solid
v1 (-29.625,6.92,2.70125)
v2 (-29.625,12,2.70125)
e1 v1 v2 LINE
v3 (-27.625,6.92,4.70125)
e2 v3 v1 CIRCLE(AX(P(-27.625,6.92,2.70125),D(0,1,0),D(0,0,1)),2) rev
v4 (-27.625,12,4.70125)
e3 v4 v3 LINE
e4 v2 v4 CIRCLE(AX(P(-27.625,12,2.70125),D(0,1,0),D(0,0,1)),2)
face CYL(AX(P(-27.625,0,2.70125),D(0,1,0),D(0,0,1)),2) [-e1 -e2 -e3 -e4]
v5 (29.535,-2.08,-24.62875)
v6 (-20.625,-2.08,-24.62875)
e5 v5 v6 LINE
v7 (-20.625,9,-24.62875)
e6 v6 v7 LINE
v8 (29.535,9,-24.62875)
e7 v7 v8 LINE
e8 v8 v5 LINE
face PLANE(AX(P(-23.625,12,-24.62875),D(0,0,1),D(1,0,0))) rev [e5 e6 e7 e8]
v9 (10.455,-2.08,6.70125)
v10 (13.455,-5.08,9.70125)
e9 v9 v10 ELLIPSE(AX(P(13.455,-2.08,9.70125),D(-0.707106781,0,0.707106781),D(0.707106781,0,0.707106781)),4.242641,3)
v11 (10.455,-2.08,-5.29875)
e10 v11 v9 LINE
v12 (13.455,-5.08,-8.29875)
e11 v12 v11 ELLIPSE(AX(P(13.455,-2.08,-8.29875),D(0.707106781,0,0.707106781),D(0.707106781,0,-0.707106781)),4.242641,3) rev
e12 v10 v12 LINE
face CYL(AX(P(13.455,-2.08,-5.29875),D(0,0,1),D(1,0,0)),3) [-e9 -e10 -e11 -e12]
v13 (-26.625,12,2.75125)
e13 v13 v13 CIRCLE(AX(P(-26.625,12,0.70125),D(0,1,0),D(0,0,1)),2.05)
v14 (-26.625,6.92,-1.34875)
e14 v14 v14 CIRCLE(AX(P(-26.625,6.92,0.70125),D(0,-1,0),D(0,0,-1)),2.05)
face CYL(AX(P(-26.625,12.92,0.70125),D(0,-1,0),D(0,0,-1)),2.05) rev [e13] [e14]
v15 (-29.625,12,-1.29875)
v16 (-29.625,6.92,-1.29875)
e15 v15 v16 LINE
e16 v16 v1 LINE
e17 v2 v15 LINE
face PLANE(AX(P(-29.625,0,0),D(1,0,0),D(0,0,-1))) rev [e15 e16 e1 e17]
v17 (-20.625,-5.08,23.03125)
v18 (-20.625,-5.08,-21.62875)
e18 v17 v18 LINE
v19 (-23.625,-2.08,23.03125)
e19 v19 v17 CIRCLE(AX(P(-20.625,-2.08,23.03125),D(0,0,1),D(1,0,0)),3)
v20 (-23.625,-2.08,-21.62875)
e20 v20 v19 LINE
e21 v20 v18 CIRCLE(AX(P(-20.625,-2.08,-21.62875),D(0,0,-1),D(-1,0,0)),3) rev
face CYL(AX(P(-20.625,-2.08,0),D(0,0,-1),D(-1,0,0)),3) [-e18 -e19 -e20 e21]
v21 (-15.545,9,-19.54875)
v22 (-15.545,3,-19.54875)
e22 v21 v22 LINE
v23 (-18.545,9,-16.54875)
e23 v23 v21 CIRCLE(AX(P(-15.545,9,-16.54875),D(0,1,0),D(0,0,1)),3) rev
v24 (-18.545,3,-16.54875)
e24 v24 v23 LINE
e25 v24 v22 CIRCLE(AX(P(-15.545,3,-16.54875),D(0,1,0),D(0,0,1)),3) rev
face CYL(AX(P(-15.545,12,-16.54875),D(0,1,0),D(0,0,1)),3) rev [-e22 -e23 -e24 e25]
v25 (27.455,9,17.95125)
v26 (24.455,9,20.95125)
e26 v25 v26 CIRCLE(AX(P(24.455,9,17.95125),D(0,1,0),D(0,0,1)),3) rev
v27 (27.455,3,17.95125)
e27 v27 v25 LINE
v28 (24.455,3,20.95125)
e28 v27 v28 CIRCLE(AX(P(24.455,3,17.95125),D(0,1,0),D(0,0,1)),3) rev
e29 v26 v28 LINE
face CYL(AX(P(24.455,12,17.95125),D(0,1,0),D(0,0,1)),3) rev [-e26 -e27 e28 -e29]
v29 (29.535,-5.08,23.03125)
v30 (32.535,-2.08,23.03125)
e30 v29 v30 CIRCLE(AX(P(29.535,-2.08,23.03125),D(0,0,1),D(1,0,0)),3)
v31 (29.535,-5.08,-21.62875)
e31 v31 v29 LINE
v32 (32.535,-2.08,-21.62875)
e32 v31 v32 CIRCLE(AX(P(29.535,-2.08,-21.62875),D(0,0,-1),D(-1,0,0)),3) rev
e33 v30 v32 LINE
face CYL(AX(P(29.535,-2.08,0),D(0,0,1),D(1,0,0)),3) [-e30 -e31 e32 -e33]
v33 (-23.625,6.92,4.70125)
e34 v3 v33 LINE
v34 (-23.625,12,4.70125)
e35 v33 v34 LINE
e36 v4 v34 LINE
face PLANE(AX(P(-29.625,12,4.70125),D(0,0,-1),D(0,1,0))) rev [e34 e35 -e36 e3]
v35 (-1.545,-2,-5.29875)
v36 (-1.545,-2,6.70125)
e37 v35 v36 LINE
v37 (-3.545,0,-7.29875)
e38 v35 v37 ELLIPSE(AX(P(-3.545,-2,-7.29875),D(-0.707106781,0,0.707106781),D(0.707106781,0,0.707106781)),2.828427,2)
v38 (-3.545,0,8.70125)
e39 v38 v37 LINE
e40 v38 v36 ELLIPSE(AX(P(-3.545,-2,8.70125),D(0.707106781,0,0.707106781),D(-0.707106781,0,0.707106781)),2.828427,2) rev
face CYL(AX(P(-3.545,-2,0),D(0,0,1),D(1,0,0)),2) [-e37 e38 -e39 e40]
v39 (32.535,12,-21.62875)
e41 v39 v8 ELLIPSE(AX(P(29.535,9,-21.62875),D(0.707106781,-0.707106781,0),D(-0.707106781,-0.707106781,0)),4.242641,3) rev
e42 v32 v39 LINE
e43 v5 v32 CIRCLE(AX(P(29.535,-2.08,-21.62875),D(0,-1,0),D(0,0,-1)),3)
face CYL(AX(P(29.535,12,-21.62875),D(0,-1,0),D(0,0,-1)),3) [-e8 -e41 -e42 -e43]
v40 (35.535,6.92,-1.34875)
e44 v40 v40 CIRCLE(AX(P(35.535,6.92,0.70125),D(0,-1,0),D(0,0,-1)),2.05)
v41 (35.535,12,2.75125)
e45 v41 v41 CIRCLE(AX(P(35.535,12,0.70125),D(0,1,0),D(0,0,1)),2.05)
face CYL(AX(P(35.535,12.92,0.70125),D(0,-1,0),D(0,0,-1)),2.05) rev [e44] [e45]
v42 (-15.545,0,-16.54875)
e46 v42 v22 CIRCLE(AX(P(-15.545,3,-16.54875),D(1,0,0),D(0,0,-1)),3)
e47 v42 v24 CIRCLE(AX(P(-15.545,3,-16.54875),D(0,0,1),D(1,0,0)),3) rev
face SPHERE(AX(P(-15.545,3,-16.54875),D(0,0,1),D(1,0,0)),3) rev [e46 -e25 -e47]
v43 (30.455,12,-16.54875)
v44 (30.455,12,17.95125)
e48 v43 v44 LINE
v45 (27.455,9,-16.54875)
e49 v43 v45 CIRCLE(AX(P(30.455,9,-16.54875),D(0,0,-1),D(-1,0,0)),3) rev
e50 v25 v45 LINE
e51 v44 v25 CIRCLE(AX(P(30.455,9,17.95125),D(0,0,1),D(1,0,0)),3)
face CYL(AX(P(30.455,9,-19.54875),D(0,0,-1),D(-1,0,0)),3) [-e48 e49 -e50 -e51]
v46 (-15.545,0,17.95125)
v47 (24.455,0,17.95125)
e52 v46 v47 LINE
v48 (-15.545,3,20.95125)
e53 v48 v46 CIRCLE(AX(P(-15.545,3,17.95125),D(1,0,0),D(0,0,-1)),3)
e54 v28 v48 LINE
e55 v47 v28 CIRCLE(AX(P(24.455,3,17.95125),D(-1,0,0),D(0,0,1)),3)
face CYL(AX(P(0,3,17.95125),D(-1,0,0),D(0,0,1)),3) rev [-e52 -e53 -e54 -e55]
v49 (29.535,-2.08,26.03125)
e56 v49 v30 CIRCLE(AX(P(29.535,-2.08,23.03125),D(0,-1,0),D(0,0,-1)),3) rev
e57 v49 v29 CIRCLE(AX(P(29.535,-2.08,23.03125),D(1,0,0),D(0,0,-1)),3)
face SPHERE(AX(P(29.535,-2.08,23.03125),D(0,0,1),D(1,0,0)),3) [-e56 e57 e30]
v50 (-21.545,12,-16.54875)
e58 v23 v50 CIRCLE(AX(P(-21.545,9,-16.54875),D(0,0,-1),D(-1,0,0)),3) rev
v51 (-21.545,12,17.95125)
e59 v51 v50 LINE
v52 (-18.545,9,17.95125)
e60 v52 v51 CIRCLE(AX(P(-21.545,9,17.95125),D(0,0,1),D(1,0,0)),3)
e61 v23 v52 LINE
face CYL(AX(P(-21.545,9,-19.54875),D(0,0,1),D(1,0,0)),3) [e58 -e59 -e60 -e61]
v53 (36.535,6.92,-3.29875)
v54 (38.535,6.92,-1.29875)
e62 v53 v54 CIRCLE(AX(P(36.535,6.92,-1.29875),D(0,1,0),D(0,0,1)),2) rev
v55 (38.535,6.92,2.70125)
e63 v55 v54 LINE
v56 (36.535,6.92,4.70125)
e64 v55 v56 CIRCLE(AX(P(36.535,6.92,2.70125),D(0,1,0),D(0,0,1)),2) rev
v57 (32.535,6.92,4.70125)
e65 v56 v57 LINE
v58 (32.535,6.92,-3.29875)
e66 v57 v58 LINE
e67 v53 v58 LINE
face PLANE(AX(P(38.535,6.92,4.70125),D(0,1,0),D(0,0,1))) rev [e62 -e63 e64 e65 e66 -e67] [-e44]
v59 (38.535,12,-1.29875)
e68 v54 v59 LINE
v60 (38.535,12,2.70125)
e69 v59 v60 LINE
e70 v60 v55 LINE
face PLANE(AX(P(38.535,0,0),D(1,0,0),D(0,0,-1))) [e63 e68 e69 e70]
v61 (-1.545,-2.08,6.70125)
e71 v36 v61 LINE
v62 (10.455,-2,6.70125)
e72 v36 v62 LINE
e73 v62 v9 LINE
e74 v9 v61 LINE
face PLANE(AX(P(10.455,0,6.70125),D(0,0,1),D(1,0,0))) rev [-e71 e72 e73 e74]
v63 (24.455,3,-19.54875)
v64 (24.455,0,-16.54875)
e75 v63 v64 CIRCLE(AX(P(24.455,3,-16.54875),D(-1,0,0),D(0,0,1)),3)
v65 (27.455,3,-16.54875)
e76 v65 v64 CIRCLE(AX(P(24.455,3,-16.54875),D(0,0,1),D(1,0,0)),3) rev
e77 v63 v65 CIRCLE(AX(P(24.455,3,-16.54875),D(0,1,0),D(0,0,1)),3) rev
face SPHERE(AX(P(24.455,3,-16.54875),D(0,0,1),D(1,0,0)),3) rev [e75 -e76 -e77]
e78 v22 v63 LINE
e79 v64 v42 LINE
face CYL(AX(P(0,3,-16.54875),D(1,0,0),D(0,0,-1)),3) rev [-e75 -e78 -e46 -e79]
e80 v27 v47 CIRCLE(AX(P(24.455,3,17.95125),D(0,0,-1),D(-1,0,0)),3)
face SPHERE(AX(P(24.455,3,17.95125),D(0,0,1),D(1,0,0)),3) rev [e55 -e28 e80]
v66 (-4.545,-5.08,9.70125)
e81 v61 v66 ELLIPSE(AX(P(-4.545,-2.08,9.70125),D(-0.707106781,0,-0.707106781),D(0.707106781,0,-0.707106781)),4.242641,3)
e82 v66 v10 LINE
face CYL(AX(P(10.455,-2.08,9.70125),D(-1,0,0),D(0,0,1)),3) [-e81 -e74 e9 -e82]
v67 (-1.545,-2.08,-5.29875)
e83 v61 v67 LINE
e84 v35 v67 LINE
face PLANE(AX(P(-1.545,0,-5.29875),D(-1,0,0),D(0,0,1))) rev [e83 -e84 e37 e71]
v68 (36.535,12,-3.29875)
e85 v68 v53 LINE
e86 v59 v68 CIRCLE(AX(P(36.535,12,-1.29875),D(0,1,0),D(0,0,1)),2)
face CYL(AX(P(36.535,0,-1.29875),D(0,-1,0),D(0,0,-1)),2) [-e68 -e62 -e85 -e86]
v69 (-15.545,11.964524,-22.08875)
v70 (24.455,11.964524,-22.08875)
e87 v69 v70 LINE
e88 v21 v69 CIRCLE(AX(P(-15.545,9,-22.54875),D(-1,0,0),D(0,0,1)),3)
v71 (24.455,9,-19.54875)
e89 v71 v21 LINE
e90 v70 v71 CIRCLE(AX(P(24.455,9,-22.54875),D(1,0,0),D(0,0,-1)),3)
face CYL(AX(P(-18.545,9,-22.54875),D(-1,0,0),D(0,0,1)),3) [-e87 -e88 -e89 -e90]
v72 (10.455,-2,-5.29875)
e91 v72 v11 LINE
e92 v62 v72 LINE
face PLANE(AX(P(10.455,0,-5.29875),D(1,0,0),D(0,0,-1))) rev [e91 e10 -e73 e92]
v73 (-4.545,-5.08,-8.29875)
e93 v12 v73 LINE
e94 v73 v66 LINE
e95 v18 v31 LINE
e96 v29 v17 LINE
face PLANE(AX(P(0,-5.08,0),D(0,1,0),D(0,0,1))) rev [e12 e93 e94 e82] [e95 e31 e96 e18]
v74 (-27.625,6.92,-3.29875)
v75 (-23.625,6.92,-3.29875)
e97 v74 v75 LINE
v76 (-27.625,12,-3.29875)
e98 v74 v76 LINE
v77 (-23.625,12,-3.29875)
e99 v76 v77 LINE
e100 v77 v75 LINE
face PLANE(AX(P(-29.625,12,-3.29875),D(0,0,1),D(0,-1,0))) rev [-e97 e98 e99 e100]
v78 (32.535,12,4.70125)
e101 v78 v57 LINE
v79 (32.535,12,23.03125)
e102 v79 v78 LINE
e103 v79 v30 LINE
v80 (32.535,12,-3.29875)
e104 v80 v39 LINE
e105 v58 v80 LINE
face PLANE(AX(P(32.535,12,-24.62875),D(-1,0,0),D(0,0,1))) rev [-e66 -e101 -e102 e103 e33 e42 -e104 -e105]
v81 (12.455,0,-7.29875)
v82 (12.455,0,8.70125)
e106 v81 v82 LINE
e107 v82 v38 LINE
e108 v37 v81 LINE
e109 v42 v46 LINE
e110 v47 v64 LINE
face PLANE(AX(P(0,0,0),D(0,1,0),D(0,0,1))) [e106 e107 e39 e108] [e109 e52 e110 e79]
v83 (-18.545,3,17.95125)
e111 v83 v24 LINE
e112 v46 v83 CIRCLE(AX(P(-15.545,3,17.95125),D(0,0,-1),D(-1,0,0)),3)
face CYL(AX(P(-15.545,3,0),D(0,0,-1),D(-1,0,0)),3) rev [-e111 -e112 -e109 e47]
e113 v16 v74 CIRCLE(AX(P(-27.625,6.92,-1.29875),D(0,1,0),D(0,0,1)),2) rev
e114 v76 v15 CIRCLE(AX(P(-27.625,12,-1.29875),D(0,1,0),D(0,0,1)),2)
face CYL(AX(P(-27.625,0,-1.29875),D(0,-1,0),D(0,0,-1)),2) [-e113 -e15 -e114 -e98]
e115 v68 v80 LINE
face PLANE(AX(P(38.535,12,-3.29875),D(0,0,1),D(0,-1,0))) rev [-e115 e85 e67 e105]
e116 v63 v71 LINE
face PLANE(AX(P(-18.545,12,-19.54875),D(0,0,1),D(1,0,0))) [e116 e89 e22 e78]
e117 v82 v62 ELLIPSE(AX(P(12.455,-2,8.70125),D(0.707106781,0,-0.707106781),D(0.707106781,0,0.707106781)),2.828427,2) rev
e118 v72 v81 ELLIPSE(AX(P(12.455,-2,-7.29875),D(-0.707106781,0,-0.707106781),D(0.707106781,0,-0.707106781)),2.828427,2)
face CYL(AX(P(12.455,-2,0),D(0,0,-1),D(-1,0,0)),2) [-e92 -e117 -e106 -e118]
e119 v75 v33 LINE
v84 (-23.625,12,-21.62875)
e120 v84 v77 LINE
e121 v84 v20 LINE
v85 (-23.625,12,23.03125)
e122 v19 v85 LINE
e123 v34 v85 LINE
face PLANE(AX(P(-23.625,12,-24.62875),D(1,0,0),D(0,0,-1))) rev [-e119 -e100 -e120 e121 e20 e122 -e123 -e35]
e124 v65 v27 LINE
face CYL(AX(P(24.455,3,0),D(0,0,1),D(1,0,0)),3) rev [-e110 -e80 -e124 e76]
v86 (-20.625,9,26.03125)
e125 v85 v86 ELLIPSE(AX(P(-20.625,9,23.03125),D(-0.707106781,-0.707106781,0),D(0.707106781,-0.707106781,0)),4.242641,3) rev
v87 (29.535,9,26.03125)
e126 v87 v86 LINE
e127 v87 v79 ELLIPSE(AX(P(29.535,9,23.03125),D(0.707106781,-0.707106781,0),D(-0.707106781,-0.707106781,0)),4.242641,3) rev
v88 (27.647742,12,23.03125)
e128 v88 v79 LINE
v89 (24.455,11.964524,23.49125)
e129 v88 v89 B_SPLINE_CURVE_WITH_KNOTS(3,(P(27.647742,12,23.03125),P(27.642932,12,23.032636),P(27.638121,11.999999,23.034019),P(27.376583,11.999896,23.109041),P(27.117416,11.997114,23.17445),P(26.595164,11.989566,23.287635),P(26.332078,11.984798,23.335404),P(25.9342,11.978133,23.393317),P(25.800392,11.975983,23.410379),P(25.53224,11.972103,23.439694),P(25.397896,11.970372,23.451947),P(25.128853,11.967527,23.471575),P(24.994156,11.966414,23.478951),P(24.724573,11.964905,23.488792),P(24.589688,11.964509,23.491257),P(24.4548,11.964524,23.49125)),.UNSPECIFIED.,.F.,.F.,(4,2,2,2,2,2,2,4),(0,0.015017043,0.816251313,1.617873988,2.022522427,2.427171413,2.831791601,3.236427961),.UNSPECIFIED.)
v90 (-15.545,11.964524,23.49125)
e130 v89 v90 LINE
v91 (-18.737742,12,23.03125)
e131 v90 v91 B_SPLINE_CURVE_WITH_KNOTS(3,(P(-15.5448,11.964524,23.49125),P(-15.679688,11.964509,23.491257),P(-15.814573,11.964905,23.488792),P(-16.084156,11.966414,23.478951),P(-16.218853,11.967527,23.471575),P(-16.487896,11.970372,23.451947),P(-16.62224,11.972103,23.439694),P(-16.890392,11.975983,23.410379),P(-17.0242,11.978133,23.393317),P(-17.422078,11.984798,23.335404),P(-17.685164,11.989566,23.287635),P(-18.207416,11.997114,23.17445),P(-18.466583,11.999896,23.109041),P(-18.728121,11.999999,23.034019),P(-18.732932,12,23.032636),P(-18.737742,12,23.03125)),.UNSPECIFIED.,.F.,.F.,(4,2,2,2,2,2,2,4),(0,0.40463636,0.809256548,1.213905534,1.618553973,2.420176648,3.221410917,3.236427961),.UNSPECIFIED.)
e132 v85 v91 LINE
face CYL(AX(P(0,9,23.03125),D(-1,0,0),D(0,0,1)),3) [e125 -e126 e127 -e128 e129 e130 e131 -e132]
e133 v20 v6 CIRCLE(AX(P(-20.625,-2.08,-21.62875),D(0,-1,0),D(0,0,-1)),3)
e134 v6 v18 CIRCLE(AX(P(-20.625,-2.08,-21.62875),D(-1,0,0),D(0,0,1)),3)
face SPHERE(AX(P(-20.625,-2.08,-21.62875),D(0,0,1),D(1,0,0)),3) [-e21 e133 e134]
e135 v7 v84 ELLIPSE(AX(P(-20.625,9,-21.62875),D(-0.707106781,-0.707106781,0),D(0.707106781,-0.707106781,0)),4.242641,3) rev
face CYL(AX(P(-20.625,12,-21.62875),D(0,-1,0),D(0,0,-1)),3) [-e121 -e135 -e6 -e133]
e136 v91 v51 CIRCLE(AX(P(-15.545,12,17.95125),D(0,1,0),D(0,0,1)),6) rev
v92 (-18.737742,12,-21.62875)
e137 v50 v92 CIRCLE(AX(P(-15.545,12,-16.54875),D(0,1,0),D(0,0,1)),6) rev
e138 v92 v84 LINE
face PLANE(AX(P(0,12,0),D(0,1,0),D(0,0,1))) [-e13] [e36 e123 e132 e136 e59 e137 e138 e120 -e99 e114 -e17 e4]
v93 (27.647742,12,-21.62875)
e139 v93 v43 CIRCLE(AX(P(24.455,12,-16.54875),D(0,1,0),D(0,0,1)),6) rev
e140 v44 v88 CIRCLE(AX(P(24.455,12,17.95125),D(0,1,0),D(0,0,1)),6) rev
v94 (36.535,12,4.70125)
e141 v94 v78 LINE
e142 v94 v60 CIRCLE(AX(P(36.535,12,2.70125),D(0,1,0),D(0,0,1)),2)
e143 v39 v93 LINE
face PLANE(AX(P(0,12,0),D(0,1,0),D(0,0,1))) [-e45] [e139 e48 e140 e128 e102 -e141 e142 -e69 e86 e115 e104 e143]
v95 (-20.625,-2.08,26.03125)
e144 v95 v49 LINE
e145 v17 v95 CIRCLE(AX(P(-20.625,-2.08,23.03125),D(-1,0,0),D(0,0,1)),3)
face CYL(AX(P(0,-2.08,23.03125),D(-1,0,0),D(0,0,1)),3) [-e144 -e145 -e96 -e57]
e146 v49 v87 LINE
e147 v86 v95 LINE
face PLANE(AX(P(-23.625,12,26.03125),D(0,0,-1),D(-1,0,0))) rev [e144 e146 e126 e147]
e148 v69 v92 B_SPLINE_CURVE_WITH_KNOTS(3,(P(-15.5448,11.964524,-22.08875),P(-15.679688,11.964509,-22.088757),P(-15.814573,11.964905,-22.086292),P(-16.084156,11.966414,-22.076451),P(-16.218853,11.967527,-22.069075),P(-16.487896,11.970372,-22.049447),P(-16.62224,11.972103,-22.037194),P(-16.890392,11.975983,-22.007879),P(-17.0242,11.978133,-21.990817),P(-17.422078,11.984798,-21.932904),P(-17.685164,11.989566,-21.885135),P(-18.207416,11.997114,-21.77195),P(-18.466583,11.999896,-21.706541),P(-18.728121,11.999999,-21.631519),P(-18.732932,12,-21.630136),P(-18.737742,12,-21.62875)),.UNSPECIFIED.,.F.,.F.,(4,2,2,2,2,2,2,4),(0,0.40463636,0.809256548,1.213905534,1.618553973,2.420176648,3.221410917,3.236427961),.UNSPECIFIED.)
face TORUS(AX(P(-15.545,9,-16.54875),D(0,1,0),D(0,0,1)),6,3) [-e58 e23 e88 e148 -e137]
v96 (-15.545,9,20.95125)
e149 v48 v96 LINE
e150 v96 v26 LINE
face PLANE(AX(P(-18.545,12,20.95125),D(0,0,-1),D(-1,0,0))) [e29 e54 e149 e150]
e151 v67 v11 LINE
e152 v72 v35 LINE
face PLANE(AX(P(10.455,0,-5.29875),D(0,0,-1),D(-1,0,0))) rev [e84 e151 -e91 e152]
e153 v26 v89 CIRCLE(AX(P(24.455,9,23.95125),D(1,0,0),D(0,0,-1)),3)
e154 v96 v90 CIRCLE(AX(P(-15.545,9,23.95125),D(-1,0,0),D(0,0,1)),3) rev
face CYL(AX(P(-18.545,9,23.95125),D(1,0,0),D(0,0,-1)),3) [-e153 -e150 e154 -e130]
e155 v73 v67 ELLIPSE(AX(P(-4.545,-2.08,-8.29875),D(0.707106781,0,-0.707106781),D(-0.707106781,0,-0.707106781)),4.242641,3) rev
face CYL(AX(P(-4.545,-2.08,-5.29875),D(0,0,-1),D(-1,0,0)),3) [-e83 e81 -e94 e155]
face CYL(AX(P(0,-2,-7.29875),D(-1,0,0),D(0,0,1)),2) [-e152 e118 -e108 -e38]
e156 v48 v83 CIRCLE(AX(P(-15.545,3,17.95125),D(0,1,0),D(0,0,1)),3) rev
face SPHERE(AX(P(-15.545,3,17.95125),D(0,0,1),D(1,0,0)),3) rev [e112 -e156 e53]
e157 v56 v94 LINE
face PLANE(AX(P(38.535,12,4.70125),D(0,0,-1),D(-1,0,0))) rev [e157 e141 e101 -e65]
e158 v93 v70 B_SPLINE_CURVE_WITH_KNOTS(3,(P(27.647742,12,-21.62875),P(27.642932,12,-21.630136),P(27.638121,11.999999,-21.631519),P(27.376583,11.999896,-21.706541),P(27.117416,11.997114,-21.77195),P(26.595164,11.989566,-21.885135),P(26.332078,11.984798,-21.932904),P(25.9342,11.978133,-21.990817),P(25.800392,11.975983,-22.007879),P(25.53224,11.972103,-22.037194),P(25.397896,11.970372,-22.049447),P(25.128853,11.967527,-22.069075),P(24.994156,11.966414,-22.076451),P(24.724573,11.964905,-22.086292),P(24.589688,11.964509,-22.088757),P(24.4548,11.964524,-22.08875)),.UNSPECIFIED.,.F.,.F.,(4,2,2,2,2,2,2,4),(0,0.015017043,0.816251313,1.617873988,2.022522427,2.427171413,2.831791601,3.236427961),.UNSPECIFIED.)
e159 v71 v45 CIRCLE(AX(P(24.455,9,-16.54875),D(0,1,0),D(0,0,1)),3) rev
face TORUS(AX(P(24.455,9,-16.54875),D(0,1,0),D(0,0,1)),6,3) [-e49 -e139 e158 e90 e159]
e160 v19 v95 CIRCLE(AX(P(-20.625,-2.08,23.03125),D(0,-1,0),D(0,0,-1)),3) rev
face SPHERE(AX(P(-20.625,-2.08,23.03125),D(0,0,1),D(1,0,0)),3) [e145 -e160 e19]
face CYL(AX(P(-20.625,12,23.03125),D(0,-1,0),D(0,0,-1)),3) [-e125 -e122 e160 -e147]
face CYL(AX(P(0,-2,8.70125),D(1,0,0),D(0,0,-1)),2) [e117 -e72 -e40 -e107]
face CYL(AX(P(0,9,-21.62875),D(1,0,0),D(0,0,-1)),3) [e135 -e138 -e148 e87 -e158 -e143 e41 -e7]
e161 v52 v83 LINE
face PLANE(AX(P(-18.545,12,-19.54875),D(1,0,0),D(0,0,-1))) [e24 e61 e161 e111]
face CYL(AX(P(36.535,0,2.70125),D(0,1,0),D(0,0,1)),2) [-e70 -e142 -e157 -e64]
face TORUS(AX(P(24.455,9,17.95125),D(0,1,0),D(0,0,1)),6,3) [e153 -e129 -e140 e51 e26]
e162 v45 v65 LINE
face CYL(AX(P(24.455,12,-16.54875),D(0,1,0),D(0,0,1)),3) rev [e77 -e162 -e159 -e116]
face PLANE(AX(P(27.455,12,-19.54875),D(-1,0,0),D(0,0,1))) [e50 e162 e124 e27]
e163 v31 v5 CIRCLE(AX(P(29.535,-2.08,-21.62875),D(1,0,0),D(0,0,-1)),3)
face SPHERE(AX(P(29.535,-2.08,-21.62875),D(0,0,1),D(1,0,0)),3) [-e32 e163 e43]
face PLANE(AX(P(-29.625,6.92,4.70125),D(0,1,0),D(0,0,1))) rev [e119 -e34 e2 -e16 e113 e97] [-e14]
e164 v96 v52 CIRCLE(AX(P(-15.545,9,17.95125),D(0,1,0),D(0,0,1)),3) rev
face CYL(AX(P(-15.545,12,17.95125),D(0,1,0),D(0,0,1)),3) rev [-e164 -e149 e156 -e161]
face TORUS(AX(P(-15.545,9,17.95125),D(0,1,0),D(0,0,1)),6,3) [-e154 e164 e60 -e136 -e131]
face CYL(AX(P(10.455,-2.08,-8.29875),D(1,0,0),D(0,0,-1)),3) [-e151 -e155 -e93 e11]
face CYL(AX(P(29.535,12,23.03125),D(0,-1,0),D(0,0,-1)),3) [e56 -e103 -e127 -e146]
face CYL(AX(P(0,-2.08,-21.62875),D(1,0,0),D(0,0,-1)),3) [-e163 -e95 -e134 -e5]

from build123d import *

# Parameters (mm, degrees)
SKETCH1_W           = 56.16
SKETCH1_H           = 50.66
SKETCH1_W_2         = 46
SKETCH1_H_2         = 40.5
BOSS_EXTRUDE1_DEPTH = 12
SKETCH2_W           = 56.16
SKETCH2_H           = 50.66
BOSS_EXTRUDE2_DEPTH = 5.08
SKETCH3_W           = 12
SKETCH3_H           = 12
CUT_EXTRUDE1_DEPTH  = 5.08
SKETCH4_W           = 8
SKETCH4_H           = 5.08
BOSS_EXTRUDE3_DEPTH = 6
SKETCH5_W           = 8
SKETCH5_H           = 5.08
BOSS_EXTRUDE4_DEPTH = 6
SKETCH6_R           = 2.05
CUT_EXTRUDE2_DEPTH  = 6
FILLET1_R           = 3
FILLET2_R           = 2
FILLET3_R           = 2


with BuildPart() as part:
    # Sketch1 → Boss-Extrude1 (new body)
    with BuildSketch(Plane(origin=(0, 0, 0), x_dir=(1, 0, 0), z_dir=(0, 1, 0))):
        with Locations((4.455, -0.70125)):
            Rectangle(SKETCH1_W, SKETCH1_H)
        with Locations((4.455, -0.70125)):
            Rectangle(SKETCH1_W_2, SKETCH1_H_2, mode=Mode.SUBTRACT)
    extrude(amount=BOSS_EXTRUDE1_DEPTH)

    # Sketch2 → Boss-Extrude2 (add)
    with BuildSketch(Plane.XZ):
        with Locations((4.455, 0.70125)):
            Rectangle(SKETCH2_W, SKETCH2_H)
    extrude(amount=BOSS_EXTRUDE2_DEPTH)

    # Sketch3 → Cut-Extrude1 (cut)
    with BuildSketch(Plane.XZ.offset(5.08)):
        with Locations((4.455, 0.70125)):
            Rectangle(SKETCH3_W, SKETCH3_H)
    extrude(amount=-CUT_EXTRUDE1_DEPTH, mode=Mode.SUBTRACT)

    # Sketch4 → Boss-Extrude3 (add)
    with BuildSketch(Plane(origin=(32.535, 0, 0), x_dir=(0, 0, -1), z_dir=(1, 0, 0))):
        with Locations((-0.70125, 9.46)):
            Rectangle(SKETCH4_W, SKETCH4_H)
    extrude(amount=BOSS_EXTRUDE3_DEPTH)

    # Sketch5 → Boss-Extrude4 (add)
    with BuildSketch(Plane.ZY.offset(23.625)):
        with Locations((0.70125, 9.46)):
            Rectangle(SKETCH5_W, SKETCH5_H)
    extrude(amount=BOSS_EXTRUDE4_DEPTH)

    # Sketch6 → Cut-Extrude2 (cut)
    with BuildSketch(Plane.XZ.offset(-6.92)):
        with Locations(Location((35.535, 0.70125, 0), (0, 0, 270))):
            Circle(SKETCH6_R)
        with Locations(Location((-26.625, 0.70125, 0), (0, 0, 270))):
            Circle(SKETCH6_R)
    extrude(amount=-CUT_EXTRUDE2_DEPTH, mode=Mode.SUBTRACT)

    # Fillet1
    # the kernel refuses this fillet: 3 mm, written as the material it adds along each edge
    with BuildSketch(Plane(origin=(-15.545, 3, 17.95125), x_dir=(-1, 0, 0), z_dir=(0, -1, 0))) as fillet1_piece_1_section:
        Polygon((0, 0), (FILLET1_R, 0), (FILLET1_R, -FILLET1_R), (0, -FILLET1_R), align=None)
    fillet1_piece_1 = extrude(amount=FILLET1_R, mode=Mode.PRIVATE)
    fillet1_piece_1 = fillet1_piece_1 - Plane(origin=(-15.545, 3, 17.95125), x_dir=(0.7071067811865475, 0, -0.7071067811865475), z_dir=(0, -1, 0)) * Sphere(FILLET1_R, mode=Mode.PRIVATE)
    add(fillet1_piece_1)
    with BuildSketch(Plane(origin=(-15.545, 3, -16.54875), x_dir=(-1, 0, 0), z_dir=(0, -1, 0))) as fillet1_piece_2_section:
        Polygon((0, 0), (FILLET1_R, 0), (FILLET1_R, FILLET1_R), (0, FILLET1_R), align=None)
    fillet1_piece_2 = extrude(amount=FILLET1_R, mode=Mode.PRIVATE)
    fillet1_piece_2 = fillet1_piece_2 - Plane(origin=(-15.545, 3, -16.54875), x_dir=(0.7071067811865476, 0, 0.7071067811865475), z_dir=(0, -1, 0)) * Sphere(FILLET1_R, mode=Mode.PRIVATE)
    add(fillet1_piece_2)
    with BuildSketch(Plane(origin=(24.455, 3, 17.95125), x_dir=(1, 0, 0), z_dir=(0, -1, 0))) as fillet1_piece_3_section:
        Polygon((0, 0), (FILLET1_R, 0), (FILLET1_R, FILLET1_R), (0, FILLET1_R), align=None)
    fillet1_piece_3 = extrude(amount=FILLET1_R, mode=Mode.PRIVATE)
    fillet1_piece_3 = fillet1_piece_3 - Plane(origin=(24.455, 3, 17.95125), x_dir=(-0.7071067811865476, 0, -0.7071067811865475), z_dir=(0, -1, 0)) * Sphere(FILLET1_R, mode=Mode.PRIVATE)
    add(fillet1_piece_3)
    with BuildSketch(Plane(origin=(24.455, 3, -16.54875), x_dir=(0, -1, 0), z_dir=(1, 0, 0))) as fillet1_piece_4_section:
        Polygon((0, 0), (FILLET1_R, 0), (FILLET1_R, FILLET1_R), (0, FILLET1_R), align=None)
    fillet1_piece_4 = extrude(amount=FILLET1_R, mode=Mode.PRIVATE)
    fillet1_piece_4 = fillet1_piece_4 - Plane(origin=(24.455, 3, -16.54875), x_dir=(0, 0.7071067811865475, 0.7071067811865475), z_dir=(1, 0, 0)) * Sphere(FILLET1_R, mode=Mode.PRIVATE)
    add(fillet1_piece_4)
    with BuildSketch(Plane(origin=(-18.545, 0, 17.95125), x_dir=(0, 1, 0), z_dir=(0, 0, -1)), Plane(origin=(27.455, 0, -16.54875), x_dir=(0, 1, 0), z_dir=(0, 0, 1))) as fillet1_piece_5:
        with BuildLine():
            CenterArc((FILLET1_R, FILLET1_R), FILLET1_R, 180, 90)
            Line((0, FILLET1_R), (0, 0))
            Line((0, 0), (FILLET1_R, 0))
        make_face()
    extrude(amount=34.5)
    with BuildSketch(Plane(origin=(-18.545, 3, -19.54875), x_dir=(0, 0, 1), z_dir=(0, 1, 0)), Plane(origin=(27.455, 3, -19.54875), x_dir=(-1, 0, 0), z_dir=(0, 1, 0))) as fillet1_piece_6:
        with BuildLine():
            CenterArc((FILLET1_R, FILLET1_R), FILLET1_R, 180, 90)
            Line((0, FILLET1_R), (0, 0))
            Line((0, 0), (FILLET1_R, 0))
        make_face()
    extrude(amount=9)
    with BuildSketch(Plane(origin=(24.455, 0, 20.95125), x_dir=(0, 1, 0), z_dir=(-1, 0, 0)), Plane(origin=(-15.545, 0, -19.54875), x_dir=(0, 1, 0), z_dir=(1, 0, 0))) as fillet1_piece_7:
        with BuildLine():
            CenterArc((FILLET1_R, FILLET1_R), FILLET1_R, 180, 90)
            Line((0, FILLET1_R), (0, 0))
            Line((0, 0), (FILLET1_R, 0))
        make_face()
    extrude(amount=40)
    with BuildSketch(Plane(origin=(-18.545, 3, 20.95125), x_dir=(0, 0, -1), z_dir=(0, 1, 0)), Plane(origin=(27.455, 3, 20.95125), x_dir=(-1, 0, 0), z_dir=(0, 1, 0))) as fillet1_piece_8:
        with BuildLine():
            CenterArc((FILLET1_R, -FILLET1_R), FILLET1_R, 90, 90)
            Line((0, -FILLET1_R), (0, 0))
            Line((0, 0), (FILLET1_R, 0))
        make_face()
    extrude(amount=9)
    # the kernel refuses this fillet: 3 mm, written as the material it takes off along each edge
    with BuildSketch(Plane(origin=(29.535, -2.08, -21.62875), x_dir=(1, 0, 0), z_dir=(0, 0, -1))) as fillet1_2_piece_1_section:
        Polygon((0, 0), (FILLET1_R, 0), (FILLET1_R, FILLET1_R), (0, FILLET1_R), align=None)
    fillet1_2_piece_1 = extrude(amount=FILLET1_R, mode=Mode.PRIVATE)
    fillet1_2_piece_1 = fillet1_2_piece_1 - Plane(origin=(29.535, -2.08, -21.62875), x_dir=(-0.7071067811865475, 0.7071067811865475, 0), z_dir=(0, 0, -1)) * Sphere(FILLET1_R, mode=Mode.PRIVATE)
    add(fillet1_2_piece_1, mode=Mode.SUBTRACT)
    with BuildSketch(Plane(origin=(29.535, -2.08, 23.03125), x_dir=(1, 0, 0), z_dir=(0, 0, 1))) as fillet1_2_piece_2_section:
        Polygon((0, 0), (FILLET1_R, 0), (FILLET1_R, -FILLET1_R), (0, -FILLET1_R), align=None)
    fillet1_2_piece_2 = extrude(amount=FILLET1_R, mode=Mode.PRIVATE)
    fillet1_2_piece_2 = fillet1_2_piece_2 - Plane(origin=(29.535, -2.08, 23.03125), x_dir=(-0.7071067811865475, 0.7071067811865475, 0), z_dir=(0, 0, 1)) * Sphere(FILLET1_R, mode=Mode.PRIVATE)
    add(fillet1_2_piece_2, mode=Mode.SUBTRACT)
    with BuildSketch(Plane(origin=(-20.625, -2.08, 23.03125), x_dir=(0, -1, 0), z_dir=(0, 0, 1))) as fillet1_2_piece_3_section:
        Polygon((0, 0), (FILLET1_R, 0), (FILLET1_R, -FILLET1_R), (0, -FILLET1_R), align=None)
    fillet1_2_piece_3 = extrude(amount=FILLET1_R, mode=Mode.PRIVATE)
    fillet1_2_piece_3 = fillet1_2_piece_3 - Plane(origin=(-20.625, -2.08, 23.03125), x_dir=(0.7071067811865475, 0.7071067811865475, 0), z_dir=(0, 0, 1)) * Sphere(FILLET1_R, mode=Mode.PRIVATE)
    add(fillet1_2_piece_3, mode=Mode.SUBTRACT)
    with BuildSketch(Plane(origin=(-20.625, -2.08, -21.62875), x_dir=(0, -1, 0), z_dir=(0, 0, -1))) as fillet1_2_piece_4_section:
        Polygon((0, 0), (FILLET1_R, 0), (FILLET1_R, FILLET1_R), (0, FILLET1_R), align=None)
    fillet1_2_piece_4 = extrude(amount=FILLET1_R, mode=Mode.PRIVATE)
    fillet1_2_piece_4 = fillet1_2_piece_4 - Plane(origin=(-20.625, -2.08, -21.62875), x_dir=(0.7071067811865475, 0.7071067811865475, 0), z_dir=(0, 0, -1)) * Sphere(FILLET1_R, mode=Mode.PRIVATE)
    add(fillet1_2_piece_4, mode=Mode.SUBTRACT)
    with BuildSketch(Plane(origin=(-31.125, 12, -24.62875), x_dir=(0, -1, 0), z_dir=(1, 0, 0))) as fillet1_2_piece_5:
        with BuildLine():
            CenterArc((FILLET1_R, -FILLET1_R), FILLET1_R, 90, 90)
            Line((0, -FILLET1_R), (0, 0))
            Line((0, 0), (FILLET1_R, 0))
        make_face()
    extrude(amount=71.16, mode=Mode.SUBTRACT)
    with BuildSketch(Plane(origin=(32.535, -5.08, -21.62875), x_dir=(0, 1, 0), z_dir=(0, 0, 1))) as fillet1_2_piece_6:
        with BuildLine():
            CenterArc((FILLET1_R, FILLET1_R), FILLET1_R, 180, 90)
            Line((0, FILLET1_R), (0, 0))
            Line((0, 0), (FILLET1_R, 0))
        make_face()
    extrude(amount=44.66, mode=Mode.SUBTRACT)
    with BuildSketch(Plane(origin=(29.535, -5.08, 26.03125), x_dir=(0, 0, -1), z_dir=(-1, 0, 0))) as fillet1_2_piece_7:
        with BuildLine():
            CenterArc((FILLET1_R, -FILLET1_R), FILLET1_R, 90, 90)
            Line((0, -FILLET1_R), (0, 0))
            Line((0, 0), (FILLET1_R, 0))
        make_face()
    extrude(amount=50.16, mode=Mode.SUBTRACT)
    with BuildSketch(Plane(origin=(-23.625, -5.08, 23.03125), x_dir=(1, 0, 0), z_dir=(0, 0, -1))) as fillet1_2_piece_8:
        with BuildLine():
            CenterArc((FILLET1_R, -FILLET1_R), FILLET1_R, 90, 90)
            Line((0, -FILLET1_R), (0, 0))
            Line((0, 0), (FILLET1_R, 0))
        make_face()
    extrude(amount=44.66, mode=Mode.SUBTRACT)
    with BuildSketch(Plane(origin=(-20.625, -5.08, -24.62875), x_dir=(0, 1, 0), z_dir=(1, 0, 0))) as fillet1_2_piece_9:
        with BuildLine():
            CenterArc((FILLET1_R, FILLET1_R), FILLET1_R, 180, 90)
            Line((0, FILLET1_R), (0, 0))
            Line((0, 0), (FILLET1_R, 0))
        make_face()
    extrude(amount=50.16, mode=Mode.SUBTRACT)
    with BuildSketch(Plane(origin=(10.455, -5.08, 6.70125), x_dir=(1, 0, 0), z_dir=(0, 0, -1)), Plane(origin=(-1.545, -5.08, 6.70125), x_dir=(0, 0, 1), z_dir=(1, 0, 0)), Plane(origin=(-1.545, -5.08, -5.29875), x_dir=(-1, 0, 0), z_dir=(0, 0, 1)), Plane(origin=(10.455, -5.08, -5.29875), x_dir=(0, 0, -1), z_dir=(-1, 0, 0))) as fillet1_2_piece_10:
        with BuildLine():
            CenterArc((FILLET1_R, -FILLET1_R), FILLET1_R, 90, 90)
            Line((0, -FILLET1_R), (0, 0))
            Line((0, 0), (FILLET1_R, 0))
        make_face()
    extrude(amount=12, mode=Mode.SUBTRACT)
    with BuildSketch(Plane(origin=(-23.625, -2.08, -24.62875), x_dir=(1, 0, 0), z_dir=(0, 1, 0)), Plane(origin=(32.535, 19.5, -24.62875), x_dir=(-1, 0, 0), z_dir=(0, -1, 0)), Plane(origin=(32.535, 19.5, 26.03125), x_dir=(0, 0, -1), z_dir=(0, -1, 0)), Plane(origin=(-23.625, -2.08, 26.03125), x_dir=(0, 0, -1), z_dir=(0, 1, 0))) as fillet1_2_piece_11:
        with BuildLine():
            CenterArc((FILLET1_R, -FILLET1_R), FILLET1_R, 90, 90)
            Line((0, -FILLET1_R), (0, 0))
            Line((0, 0), (FILLET1_R, 0))
        make_face()
    extrude(amount=21.58, mode=Mode.SUBTRACT)
    with BuildSketch(Plane(origin=(40.035, 12, 26.03125), x_dir=(0, 0, -1), z_dir=(-1, 0, 0))) as fillet1_2_piece_12:
        with BuildLine():
            CenterArc((FILLET1_R, FILLET1_R), FILLET1_R, 180, 90)
            Line((0, FILLET1_R), (0, 0))
            Line((0, 0), (FILLET1_R, 0))
        make_face()
    extrude(amount=71.16, mode=Mode.SUBTRACT)
    with BuildSketch(Plane(origin=(10.455, -5.08, 14.20125), x_dir=(1, 0, 0), z_dir=(0, 0, -1))) as fillet1_2_piece_13a_section:
        with BuildLine():
            CenterArc((FILLET1_R, -FILLET1_R), FILLET1_R, 90, 90)
            Line((0, -FILLET1_R), (0, 0))
            Line((0, 0), (FILLET1_R, 0))
        make_face()
    fillet1_2_piece_13a = extrude(amount=19.5, mode=Mode.PRIVATE)
    fillet1_2_piece_13a = split(fillet1_2_piece_13a, bisect_by=Plane(origin=(11.134185343, -4.400814657, 6.70125), z_dir=(0, 0, 1)), keep=Keep.TOP, mode=Mode.PRIVATE)
    with BuildSketch(Plane(origin=(-1.545, -5.08, 6.70125), x_dir=(0, 0, 1), z_dir=(1, 0, 0))) as fillet1_2_piece_13b_section:
        with BuildLine():
            CenterArc((FILLET1_R, -FILLET1_R), FILLET1_R, 90, 90)
            Line((0, -FILLET1_R), (0, 0))
            Line((0, 0), (FILLET1_R, 0))
        make_face()
    fillet1_2_piece_13b = extrude(amount=19.5, mode=Mode.PRIVATE)
    fillet1_2_piece_13b = split(fillet1_2_piece_13b, bisect_by=Plane(origin=(10.455, -4.400814657, 7.380435343), z_dir=(1, 0, 0)), keep=Keep.TOP, mode=Mode.PRIVATE)
    fillet1_2_piece_13 = fillet1_2_piece_13a & fillet1_2_piece_13b
    add(fillet1_2_piece_13, mode=Mode.SUBTRACT)
    with BuildSketch(Plane(origin=(10.455, -5.08, 6.70125), x_dir=(1, 0, 0), z_dir=(0, 0, -1))) as fillet1_2_piece_14a_section:
        with BuildLine():
            CenterArc((FILLET1_R, -FILLET1_R), FILLET1_R, 90, 90)
            Line((0, -FILLET1_R), (0, 0))
            Line((0, 0), (FILLET1_R, 0))
        make_face()
    fillet1_2_piece_14a = extrude(amount=19.5, mode=Mode.PRIVATE)
    fillet1_2_piece_14a = split(fillet1_2_piece_14a, bisect_by=Plane(origin=(11.134185343, -4.400814657, -5.29875), z_dir=(0, 0, -1)), keep=Keep.TOP, mode=Mode.PRIVATE)
    with BuildSketch(Plane(origin=(17.955, -5.08, -5.29875), x_dir=(0, 0, -1), z_dir=(-1, 0, 0))) as fillet1_2_piece_14b_section:
        with BuildLine():
            CenterArc((FILLET1_R, -FILLET1_R), FILLET1_R, 90, 90)
            Line((0, -FILLET1_R), (0, 0))
            Line((0, 0), (FILLET1_R, 0))
        make_face()
    fillet1_2_piece_14b = extrude(amount=19.5, mode=Mode.PRIVATE)
    fillet1_2_piece_14b = split(fillet1_2_piece_14b, bisect_by=Plane(origin=(10.455, -4.400814657, -5.977935343), z_dir=(1, 0, 0)), keep=Keep.TOP, mode=Mode.PRIVATE)
    fillet1_2_piece_14 = fillet1_2_piece_14a & fillet1_2_piece_14b
    add(fillet1_2_piece_14, mode=Mode.SUBTRACT)
    with BuildSketch(Plane(origin=(-9.045, -5.08, 6.70125), x_dir=(0, 0, 1), z_dir=(1, 0, 0))) as fillet1_2_piece_15a_section:
        with BuildLine():
            CenterArc((FILLET1_R, -FILLET1_R), FILLET1_R, 90, 90)
            Line((0, -FILLET1_R), (0, 0))
            Line((0, 0), (FILLET1_R, 0))
        make_face()
    fillet1_2_piece_15a = extrude(amount=19.5, mode=Mode.PRIVATE)
    fillet1_2_piece_15a = split(fillet1_2_piece_15a, bisect_by=Plane(origin=(-1.545, -4.400814657, 7.380435343), z_dir=(-1, 0, 0)), keep=Keep.TOP, mode=Mode.PRIVATE)
    with BuildSketch(Plane(origin=(-1.545, -5.08, -5.29875), x_dir=(-1, 0, 0), z_dir=(0, 0, 1))) as fillet1_2_piece_15b_section:
        with BuildLine():
            CenterArc((FILLET1_R, -FILLET1_R), FILLET1_R, 90, 90)
            Line((0, -FILLET1_R), (0, 0))
            Line((0, 0), (FILLET1_R, 0))
        make_face()
    fillet1_2_piece_15b = extrude(amount=19.5, mode=Mode.PRIVATE)
    fillet1_2_piece_15b = split(fillet1_2_piece_15b, bisect_by=Plane(origin=(-2.224185343, -4.400814657, 6.70125), z_dir=(0, 0, 1)), keep=Keep.TOP, mode=Mode.PRIVATE)
    fillet1_2_piece_15 = fillet1_2_piece_15a & fillet1_2_piece_15b
    add(fillet1_2_piece_15, mode=Mode.SUBTRACT)
    with BuildSketch(Plane(origin=(-1.545, -5.08, -12.79875), x_dir=(-1, 0, 0), z_dir=(0, 0, 1))) as fillet1_2_piece_16a_section:
        with BuildLine():
            CenterArc((FILLET1_R, -FILLET1_R), FILLET1_R, 90, 90)
            Line((0, -FILLET1_R), (0, 0))
            Line((0, 0), (FILLET1_R, 0))
        make_face()
    fillet1_2_piece_16a = extrude(amount=19.5, mode=Mode.PRIVATE)
    fillet1_2_piece_16a = split(fillet1_2_piece_16a, bisect_by=Plane(origin=(-2.224185343, -4.400814657, -5.29875), z_dir=(0, 0, -1)), keep=Keep.TOP, mode=Mode.PRIVATE)
    with BuildSketch(Plane(origin=(10.455, -5.08, -5.29875), x_dir=(0, 0, -1), z_dir=(-1, 0, 0))) as fillet1_2_piece_16b_section:
        with BuildLine():
            CenterArc((FILLET1_R, -FILLET1_R), FILLET1_R, 90, 90)
            Line((0, -FILLET1_R), (0, 0))
            Line((0, 0), (FILLET1_R, 0))
        make_face()
    fillet1_2_piece_16b = extrude(amount=19.5, mode=Mode.PRIVATE)
    fillet1_2_piece_16b = split(fillet1_2_piece_16b, bisect_by=Plane(origin=(-1.545, -4.400814657, -5.977935343), z_dir=(-1, 0, 0)), keep=Keep.TOP, mode=Mode.PRIVATE)
    fillet1_2_piece_16 = fillet1_2_piece_16a & fillet1_2_piece_16b
    add(fillet1_2_piece_16, mode=Mode.SUBTRACT)
    # the kernel refuses this fillet: 3 mm, written as the material it takes off along each edge
    with BuildSketch(Plane(origin=(-18.545, 12, 17.95125), x_dir=(-1, 0, 0), z_dir=(0, 0, -1)), Plane(origin=(27.455, 12, -16.54875), x_dir=(1, 0, 0), z_dir=(0, 0, 1))) as fillet1_3_piece_1:
        with BuildLine():
            CenterArc((FILLET1_R, -FILLET1_R), FILLET1_R, 90, 90)
            Line((0, -FILLET1_R), (0, 0))
            Line((0, 0), (FILLET1_R, 0))
        make_face()
    extrude(amount=34.5, mode=Mode.SUBTRACT)
    with BuildSketch(Plane(origin=(24.455, 12, 20.95125), x_dir=(0, 0, 1), z_dir=(-1, 0, 0)), Plane(origin=(-15.545, 12, -19.54875), x_dir=(0, 0, -1), z_dir=(1, 0, 0))) as fillet1_3_piece_2:
        with BuildLine():
            CenterArc((FILLET1_R, -FILLET1_R), FILLET1_R, 90, 90)
            Line((0, -FILLET1_R), (0, 0))
            Line((0, 0), (FILLET1_R, 0))
        make_face()
    extrude(amount=40, mode=Mode.SUBTRACT)
    with BuildSketch(Plane(origin=(-15.545, 12, -16.54875), x_dir=(-1, 0, 0), z_dir=(0, 0, 1))) as fillet1_3_piece_3:
        with BuildLine():
            CenterArc((3 + FILLET1_R, FILLET1_R), FILLET1_R, 180, 90)
            Line((3, FILLET1_R), (3, 0))
            Line((3, 0), (3 + FILLET1_R, 0))
        make_face()
    revolve(axis=Axis((-15.545, 12, -16.54875), (0, -1, 0)), revolution_arc=90, mode=Mode.SUBTRACT)
    with BuildSketch(Plane(origin=(24.455, 12, -16.54875), x_dir=(0, 0, -1), z_dir=(-1, 0, 0))) as fillet1_3_piece_4:
        with BuildLine():
            CenterArc((3 + FILLET1_R, FILLET1_R), FILLET1_R, 180, 90)
            Line((3, FILLET1_R), (3, 0))
            Line((3, 0), (3 + FILLET1_R, 0))
        make_face()
    revolve(axis=Axis((24.455, 12, -16.54875), (0, -1, 0)), revolution_arc=90, mode=Mode.SUBTRACT)
    with BuildSketch(Plane(origin=(24.455, 12, 17.95125), x_dir=(0, 0, 1), z_dir=(-1, 0, 0))) as fillet1_3_piece_5:
        with BuildLine():
            CenterArc((3 + FILLET1_R, -FILLET1_R), FILLET1_R, 90, 90)
            Line((3, -FILLET1_R), (3, 0))
            Line((3, 0), (3 + FILLET1_R, 0))
        make_face()
    revolve(axis=Axis((24.455, 12, 17.95125), (0, 1, 0)), revolution_arc=90, mode=Mode.SUBTRACT)
    with BuildSketch(Plane(origin=(-15.545, 12, 17.95125), x_dir=(-1, 0, 0), z_dir=(0, 0, -1))) as fillet1_3_piece_6:
        with BuildLine():
            CenterArc((3 + FILLET1_R, -FILLET1_R), FILLET1_R, 90, 90)
            Line((3, -FILLET1_R), (3, 0))
            Line((3, 0), (3 + FILLET1_R, 0))
        make_face()
    revolve(axis=Axis((-15.545, 12, 17.95125), (0, 1, 0)), revolution_arc=90, mode=Mode.SUBTRACT)

    # Fillet2
    fillet2_edges = [part.edges().sort_by_distance(p)[0] for p in [
        (38.535, 9.46, 4.70125),
        (38.535, 9.46, -3.29875),
        (-29.625, 9.46, 4.70125),
        (-29.625, 9.46, -3.29875),
    ]]
    fillet(fillet2_edges, radius=FILLET2_R)

    # Fillet3
    fillet3_edges = [part.edges().sort_by_distance(p)[0] for p in [
        (10.455, 0, 0.70125),
        (4.455, 0, -5.29875),
        (-1.545, 0, 0.70125),
        (4.455, 0, 6.70125),
    ]]
    fillet(fillet3_edges, radius=FILLET3_R)


solid = part.part
